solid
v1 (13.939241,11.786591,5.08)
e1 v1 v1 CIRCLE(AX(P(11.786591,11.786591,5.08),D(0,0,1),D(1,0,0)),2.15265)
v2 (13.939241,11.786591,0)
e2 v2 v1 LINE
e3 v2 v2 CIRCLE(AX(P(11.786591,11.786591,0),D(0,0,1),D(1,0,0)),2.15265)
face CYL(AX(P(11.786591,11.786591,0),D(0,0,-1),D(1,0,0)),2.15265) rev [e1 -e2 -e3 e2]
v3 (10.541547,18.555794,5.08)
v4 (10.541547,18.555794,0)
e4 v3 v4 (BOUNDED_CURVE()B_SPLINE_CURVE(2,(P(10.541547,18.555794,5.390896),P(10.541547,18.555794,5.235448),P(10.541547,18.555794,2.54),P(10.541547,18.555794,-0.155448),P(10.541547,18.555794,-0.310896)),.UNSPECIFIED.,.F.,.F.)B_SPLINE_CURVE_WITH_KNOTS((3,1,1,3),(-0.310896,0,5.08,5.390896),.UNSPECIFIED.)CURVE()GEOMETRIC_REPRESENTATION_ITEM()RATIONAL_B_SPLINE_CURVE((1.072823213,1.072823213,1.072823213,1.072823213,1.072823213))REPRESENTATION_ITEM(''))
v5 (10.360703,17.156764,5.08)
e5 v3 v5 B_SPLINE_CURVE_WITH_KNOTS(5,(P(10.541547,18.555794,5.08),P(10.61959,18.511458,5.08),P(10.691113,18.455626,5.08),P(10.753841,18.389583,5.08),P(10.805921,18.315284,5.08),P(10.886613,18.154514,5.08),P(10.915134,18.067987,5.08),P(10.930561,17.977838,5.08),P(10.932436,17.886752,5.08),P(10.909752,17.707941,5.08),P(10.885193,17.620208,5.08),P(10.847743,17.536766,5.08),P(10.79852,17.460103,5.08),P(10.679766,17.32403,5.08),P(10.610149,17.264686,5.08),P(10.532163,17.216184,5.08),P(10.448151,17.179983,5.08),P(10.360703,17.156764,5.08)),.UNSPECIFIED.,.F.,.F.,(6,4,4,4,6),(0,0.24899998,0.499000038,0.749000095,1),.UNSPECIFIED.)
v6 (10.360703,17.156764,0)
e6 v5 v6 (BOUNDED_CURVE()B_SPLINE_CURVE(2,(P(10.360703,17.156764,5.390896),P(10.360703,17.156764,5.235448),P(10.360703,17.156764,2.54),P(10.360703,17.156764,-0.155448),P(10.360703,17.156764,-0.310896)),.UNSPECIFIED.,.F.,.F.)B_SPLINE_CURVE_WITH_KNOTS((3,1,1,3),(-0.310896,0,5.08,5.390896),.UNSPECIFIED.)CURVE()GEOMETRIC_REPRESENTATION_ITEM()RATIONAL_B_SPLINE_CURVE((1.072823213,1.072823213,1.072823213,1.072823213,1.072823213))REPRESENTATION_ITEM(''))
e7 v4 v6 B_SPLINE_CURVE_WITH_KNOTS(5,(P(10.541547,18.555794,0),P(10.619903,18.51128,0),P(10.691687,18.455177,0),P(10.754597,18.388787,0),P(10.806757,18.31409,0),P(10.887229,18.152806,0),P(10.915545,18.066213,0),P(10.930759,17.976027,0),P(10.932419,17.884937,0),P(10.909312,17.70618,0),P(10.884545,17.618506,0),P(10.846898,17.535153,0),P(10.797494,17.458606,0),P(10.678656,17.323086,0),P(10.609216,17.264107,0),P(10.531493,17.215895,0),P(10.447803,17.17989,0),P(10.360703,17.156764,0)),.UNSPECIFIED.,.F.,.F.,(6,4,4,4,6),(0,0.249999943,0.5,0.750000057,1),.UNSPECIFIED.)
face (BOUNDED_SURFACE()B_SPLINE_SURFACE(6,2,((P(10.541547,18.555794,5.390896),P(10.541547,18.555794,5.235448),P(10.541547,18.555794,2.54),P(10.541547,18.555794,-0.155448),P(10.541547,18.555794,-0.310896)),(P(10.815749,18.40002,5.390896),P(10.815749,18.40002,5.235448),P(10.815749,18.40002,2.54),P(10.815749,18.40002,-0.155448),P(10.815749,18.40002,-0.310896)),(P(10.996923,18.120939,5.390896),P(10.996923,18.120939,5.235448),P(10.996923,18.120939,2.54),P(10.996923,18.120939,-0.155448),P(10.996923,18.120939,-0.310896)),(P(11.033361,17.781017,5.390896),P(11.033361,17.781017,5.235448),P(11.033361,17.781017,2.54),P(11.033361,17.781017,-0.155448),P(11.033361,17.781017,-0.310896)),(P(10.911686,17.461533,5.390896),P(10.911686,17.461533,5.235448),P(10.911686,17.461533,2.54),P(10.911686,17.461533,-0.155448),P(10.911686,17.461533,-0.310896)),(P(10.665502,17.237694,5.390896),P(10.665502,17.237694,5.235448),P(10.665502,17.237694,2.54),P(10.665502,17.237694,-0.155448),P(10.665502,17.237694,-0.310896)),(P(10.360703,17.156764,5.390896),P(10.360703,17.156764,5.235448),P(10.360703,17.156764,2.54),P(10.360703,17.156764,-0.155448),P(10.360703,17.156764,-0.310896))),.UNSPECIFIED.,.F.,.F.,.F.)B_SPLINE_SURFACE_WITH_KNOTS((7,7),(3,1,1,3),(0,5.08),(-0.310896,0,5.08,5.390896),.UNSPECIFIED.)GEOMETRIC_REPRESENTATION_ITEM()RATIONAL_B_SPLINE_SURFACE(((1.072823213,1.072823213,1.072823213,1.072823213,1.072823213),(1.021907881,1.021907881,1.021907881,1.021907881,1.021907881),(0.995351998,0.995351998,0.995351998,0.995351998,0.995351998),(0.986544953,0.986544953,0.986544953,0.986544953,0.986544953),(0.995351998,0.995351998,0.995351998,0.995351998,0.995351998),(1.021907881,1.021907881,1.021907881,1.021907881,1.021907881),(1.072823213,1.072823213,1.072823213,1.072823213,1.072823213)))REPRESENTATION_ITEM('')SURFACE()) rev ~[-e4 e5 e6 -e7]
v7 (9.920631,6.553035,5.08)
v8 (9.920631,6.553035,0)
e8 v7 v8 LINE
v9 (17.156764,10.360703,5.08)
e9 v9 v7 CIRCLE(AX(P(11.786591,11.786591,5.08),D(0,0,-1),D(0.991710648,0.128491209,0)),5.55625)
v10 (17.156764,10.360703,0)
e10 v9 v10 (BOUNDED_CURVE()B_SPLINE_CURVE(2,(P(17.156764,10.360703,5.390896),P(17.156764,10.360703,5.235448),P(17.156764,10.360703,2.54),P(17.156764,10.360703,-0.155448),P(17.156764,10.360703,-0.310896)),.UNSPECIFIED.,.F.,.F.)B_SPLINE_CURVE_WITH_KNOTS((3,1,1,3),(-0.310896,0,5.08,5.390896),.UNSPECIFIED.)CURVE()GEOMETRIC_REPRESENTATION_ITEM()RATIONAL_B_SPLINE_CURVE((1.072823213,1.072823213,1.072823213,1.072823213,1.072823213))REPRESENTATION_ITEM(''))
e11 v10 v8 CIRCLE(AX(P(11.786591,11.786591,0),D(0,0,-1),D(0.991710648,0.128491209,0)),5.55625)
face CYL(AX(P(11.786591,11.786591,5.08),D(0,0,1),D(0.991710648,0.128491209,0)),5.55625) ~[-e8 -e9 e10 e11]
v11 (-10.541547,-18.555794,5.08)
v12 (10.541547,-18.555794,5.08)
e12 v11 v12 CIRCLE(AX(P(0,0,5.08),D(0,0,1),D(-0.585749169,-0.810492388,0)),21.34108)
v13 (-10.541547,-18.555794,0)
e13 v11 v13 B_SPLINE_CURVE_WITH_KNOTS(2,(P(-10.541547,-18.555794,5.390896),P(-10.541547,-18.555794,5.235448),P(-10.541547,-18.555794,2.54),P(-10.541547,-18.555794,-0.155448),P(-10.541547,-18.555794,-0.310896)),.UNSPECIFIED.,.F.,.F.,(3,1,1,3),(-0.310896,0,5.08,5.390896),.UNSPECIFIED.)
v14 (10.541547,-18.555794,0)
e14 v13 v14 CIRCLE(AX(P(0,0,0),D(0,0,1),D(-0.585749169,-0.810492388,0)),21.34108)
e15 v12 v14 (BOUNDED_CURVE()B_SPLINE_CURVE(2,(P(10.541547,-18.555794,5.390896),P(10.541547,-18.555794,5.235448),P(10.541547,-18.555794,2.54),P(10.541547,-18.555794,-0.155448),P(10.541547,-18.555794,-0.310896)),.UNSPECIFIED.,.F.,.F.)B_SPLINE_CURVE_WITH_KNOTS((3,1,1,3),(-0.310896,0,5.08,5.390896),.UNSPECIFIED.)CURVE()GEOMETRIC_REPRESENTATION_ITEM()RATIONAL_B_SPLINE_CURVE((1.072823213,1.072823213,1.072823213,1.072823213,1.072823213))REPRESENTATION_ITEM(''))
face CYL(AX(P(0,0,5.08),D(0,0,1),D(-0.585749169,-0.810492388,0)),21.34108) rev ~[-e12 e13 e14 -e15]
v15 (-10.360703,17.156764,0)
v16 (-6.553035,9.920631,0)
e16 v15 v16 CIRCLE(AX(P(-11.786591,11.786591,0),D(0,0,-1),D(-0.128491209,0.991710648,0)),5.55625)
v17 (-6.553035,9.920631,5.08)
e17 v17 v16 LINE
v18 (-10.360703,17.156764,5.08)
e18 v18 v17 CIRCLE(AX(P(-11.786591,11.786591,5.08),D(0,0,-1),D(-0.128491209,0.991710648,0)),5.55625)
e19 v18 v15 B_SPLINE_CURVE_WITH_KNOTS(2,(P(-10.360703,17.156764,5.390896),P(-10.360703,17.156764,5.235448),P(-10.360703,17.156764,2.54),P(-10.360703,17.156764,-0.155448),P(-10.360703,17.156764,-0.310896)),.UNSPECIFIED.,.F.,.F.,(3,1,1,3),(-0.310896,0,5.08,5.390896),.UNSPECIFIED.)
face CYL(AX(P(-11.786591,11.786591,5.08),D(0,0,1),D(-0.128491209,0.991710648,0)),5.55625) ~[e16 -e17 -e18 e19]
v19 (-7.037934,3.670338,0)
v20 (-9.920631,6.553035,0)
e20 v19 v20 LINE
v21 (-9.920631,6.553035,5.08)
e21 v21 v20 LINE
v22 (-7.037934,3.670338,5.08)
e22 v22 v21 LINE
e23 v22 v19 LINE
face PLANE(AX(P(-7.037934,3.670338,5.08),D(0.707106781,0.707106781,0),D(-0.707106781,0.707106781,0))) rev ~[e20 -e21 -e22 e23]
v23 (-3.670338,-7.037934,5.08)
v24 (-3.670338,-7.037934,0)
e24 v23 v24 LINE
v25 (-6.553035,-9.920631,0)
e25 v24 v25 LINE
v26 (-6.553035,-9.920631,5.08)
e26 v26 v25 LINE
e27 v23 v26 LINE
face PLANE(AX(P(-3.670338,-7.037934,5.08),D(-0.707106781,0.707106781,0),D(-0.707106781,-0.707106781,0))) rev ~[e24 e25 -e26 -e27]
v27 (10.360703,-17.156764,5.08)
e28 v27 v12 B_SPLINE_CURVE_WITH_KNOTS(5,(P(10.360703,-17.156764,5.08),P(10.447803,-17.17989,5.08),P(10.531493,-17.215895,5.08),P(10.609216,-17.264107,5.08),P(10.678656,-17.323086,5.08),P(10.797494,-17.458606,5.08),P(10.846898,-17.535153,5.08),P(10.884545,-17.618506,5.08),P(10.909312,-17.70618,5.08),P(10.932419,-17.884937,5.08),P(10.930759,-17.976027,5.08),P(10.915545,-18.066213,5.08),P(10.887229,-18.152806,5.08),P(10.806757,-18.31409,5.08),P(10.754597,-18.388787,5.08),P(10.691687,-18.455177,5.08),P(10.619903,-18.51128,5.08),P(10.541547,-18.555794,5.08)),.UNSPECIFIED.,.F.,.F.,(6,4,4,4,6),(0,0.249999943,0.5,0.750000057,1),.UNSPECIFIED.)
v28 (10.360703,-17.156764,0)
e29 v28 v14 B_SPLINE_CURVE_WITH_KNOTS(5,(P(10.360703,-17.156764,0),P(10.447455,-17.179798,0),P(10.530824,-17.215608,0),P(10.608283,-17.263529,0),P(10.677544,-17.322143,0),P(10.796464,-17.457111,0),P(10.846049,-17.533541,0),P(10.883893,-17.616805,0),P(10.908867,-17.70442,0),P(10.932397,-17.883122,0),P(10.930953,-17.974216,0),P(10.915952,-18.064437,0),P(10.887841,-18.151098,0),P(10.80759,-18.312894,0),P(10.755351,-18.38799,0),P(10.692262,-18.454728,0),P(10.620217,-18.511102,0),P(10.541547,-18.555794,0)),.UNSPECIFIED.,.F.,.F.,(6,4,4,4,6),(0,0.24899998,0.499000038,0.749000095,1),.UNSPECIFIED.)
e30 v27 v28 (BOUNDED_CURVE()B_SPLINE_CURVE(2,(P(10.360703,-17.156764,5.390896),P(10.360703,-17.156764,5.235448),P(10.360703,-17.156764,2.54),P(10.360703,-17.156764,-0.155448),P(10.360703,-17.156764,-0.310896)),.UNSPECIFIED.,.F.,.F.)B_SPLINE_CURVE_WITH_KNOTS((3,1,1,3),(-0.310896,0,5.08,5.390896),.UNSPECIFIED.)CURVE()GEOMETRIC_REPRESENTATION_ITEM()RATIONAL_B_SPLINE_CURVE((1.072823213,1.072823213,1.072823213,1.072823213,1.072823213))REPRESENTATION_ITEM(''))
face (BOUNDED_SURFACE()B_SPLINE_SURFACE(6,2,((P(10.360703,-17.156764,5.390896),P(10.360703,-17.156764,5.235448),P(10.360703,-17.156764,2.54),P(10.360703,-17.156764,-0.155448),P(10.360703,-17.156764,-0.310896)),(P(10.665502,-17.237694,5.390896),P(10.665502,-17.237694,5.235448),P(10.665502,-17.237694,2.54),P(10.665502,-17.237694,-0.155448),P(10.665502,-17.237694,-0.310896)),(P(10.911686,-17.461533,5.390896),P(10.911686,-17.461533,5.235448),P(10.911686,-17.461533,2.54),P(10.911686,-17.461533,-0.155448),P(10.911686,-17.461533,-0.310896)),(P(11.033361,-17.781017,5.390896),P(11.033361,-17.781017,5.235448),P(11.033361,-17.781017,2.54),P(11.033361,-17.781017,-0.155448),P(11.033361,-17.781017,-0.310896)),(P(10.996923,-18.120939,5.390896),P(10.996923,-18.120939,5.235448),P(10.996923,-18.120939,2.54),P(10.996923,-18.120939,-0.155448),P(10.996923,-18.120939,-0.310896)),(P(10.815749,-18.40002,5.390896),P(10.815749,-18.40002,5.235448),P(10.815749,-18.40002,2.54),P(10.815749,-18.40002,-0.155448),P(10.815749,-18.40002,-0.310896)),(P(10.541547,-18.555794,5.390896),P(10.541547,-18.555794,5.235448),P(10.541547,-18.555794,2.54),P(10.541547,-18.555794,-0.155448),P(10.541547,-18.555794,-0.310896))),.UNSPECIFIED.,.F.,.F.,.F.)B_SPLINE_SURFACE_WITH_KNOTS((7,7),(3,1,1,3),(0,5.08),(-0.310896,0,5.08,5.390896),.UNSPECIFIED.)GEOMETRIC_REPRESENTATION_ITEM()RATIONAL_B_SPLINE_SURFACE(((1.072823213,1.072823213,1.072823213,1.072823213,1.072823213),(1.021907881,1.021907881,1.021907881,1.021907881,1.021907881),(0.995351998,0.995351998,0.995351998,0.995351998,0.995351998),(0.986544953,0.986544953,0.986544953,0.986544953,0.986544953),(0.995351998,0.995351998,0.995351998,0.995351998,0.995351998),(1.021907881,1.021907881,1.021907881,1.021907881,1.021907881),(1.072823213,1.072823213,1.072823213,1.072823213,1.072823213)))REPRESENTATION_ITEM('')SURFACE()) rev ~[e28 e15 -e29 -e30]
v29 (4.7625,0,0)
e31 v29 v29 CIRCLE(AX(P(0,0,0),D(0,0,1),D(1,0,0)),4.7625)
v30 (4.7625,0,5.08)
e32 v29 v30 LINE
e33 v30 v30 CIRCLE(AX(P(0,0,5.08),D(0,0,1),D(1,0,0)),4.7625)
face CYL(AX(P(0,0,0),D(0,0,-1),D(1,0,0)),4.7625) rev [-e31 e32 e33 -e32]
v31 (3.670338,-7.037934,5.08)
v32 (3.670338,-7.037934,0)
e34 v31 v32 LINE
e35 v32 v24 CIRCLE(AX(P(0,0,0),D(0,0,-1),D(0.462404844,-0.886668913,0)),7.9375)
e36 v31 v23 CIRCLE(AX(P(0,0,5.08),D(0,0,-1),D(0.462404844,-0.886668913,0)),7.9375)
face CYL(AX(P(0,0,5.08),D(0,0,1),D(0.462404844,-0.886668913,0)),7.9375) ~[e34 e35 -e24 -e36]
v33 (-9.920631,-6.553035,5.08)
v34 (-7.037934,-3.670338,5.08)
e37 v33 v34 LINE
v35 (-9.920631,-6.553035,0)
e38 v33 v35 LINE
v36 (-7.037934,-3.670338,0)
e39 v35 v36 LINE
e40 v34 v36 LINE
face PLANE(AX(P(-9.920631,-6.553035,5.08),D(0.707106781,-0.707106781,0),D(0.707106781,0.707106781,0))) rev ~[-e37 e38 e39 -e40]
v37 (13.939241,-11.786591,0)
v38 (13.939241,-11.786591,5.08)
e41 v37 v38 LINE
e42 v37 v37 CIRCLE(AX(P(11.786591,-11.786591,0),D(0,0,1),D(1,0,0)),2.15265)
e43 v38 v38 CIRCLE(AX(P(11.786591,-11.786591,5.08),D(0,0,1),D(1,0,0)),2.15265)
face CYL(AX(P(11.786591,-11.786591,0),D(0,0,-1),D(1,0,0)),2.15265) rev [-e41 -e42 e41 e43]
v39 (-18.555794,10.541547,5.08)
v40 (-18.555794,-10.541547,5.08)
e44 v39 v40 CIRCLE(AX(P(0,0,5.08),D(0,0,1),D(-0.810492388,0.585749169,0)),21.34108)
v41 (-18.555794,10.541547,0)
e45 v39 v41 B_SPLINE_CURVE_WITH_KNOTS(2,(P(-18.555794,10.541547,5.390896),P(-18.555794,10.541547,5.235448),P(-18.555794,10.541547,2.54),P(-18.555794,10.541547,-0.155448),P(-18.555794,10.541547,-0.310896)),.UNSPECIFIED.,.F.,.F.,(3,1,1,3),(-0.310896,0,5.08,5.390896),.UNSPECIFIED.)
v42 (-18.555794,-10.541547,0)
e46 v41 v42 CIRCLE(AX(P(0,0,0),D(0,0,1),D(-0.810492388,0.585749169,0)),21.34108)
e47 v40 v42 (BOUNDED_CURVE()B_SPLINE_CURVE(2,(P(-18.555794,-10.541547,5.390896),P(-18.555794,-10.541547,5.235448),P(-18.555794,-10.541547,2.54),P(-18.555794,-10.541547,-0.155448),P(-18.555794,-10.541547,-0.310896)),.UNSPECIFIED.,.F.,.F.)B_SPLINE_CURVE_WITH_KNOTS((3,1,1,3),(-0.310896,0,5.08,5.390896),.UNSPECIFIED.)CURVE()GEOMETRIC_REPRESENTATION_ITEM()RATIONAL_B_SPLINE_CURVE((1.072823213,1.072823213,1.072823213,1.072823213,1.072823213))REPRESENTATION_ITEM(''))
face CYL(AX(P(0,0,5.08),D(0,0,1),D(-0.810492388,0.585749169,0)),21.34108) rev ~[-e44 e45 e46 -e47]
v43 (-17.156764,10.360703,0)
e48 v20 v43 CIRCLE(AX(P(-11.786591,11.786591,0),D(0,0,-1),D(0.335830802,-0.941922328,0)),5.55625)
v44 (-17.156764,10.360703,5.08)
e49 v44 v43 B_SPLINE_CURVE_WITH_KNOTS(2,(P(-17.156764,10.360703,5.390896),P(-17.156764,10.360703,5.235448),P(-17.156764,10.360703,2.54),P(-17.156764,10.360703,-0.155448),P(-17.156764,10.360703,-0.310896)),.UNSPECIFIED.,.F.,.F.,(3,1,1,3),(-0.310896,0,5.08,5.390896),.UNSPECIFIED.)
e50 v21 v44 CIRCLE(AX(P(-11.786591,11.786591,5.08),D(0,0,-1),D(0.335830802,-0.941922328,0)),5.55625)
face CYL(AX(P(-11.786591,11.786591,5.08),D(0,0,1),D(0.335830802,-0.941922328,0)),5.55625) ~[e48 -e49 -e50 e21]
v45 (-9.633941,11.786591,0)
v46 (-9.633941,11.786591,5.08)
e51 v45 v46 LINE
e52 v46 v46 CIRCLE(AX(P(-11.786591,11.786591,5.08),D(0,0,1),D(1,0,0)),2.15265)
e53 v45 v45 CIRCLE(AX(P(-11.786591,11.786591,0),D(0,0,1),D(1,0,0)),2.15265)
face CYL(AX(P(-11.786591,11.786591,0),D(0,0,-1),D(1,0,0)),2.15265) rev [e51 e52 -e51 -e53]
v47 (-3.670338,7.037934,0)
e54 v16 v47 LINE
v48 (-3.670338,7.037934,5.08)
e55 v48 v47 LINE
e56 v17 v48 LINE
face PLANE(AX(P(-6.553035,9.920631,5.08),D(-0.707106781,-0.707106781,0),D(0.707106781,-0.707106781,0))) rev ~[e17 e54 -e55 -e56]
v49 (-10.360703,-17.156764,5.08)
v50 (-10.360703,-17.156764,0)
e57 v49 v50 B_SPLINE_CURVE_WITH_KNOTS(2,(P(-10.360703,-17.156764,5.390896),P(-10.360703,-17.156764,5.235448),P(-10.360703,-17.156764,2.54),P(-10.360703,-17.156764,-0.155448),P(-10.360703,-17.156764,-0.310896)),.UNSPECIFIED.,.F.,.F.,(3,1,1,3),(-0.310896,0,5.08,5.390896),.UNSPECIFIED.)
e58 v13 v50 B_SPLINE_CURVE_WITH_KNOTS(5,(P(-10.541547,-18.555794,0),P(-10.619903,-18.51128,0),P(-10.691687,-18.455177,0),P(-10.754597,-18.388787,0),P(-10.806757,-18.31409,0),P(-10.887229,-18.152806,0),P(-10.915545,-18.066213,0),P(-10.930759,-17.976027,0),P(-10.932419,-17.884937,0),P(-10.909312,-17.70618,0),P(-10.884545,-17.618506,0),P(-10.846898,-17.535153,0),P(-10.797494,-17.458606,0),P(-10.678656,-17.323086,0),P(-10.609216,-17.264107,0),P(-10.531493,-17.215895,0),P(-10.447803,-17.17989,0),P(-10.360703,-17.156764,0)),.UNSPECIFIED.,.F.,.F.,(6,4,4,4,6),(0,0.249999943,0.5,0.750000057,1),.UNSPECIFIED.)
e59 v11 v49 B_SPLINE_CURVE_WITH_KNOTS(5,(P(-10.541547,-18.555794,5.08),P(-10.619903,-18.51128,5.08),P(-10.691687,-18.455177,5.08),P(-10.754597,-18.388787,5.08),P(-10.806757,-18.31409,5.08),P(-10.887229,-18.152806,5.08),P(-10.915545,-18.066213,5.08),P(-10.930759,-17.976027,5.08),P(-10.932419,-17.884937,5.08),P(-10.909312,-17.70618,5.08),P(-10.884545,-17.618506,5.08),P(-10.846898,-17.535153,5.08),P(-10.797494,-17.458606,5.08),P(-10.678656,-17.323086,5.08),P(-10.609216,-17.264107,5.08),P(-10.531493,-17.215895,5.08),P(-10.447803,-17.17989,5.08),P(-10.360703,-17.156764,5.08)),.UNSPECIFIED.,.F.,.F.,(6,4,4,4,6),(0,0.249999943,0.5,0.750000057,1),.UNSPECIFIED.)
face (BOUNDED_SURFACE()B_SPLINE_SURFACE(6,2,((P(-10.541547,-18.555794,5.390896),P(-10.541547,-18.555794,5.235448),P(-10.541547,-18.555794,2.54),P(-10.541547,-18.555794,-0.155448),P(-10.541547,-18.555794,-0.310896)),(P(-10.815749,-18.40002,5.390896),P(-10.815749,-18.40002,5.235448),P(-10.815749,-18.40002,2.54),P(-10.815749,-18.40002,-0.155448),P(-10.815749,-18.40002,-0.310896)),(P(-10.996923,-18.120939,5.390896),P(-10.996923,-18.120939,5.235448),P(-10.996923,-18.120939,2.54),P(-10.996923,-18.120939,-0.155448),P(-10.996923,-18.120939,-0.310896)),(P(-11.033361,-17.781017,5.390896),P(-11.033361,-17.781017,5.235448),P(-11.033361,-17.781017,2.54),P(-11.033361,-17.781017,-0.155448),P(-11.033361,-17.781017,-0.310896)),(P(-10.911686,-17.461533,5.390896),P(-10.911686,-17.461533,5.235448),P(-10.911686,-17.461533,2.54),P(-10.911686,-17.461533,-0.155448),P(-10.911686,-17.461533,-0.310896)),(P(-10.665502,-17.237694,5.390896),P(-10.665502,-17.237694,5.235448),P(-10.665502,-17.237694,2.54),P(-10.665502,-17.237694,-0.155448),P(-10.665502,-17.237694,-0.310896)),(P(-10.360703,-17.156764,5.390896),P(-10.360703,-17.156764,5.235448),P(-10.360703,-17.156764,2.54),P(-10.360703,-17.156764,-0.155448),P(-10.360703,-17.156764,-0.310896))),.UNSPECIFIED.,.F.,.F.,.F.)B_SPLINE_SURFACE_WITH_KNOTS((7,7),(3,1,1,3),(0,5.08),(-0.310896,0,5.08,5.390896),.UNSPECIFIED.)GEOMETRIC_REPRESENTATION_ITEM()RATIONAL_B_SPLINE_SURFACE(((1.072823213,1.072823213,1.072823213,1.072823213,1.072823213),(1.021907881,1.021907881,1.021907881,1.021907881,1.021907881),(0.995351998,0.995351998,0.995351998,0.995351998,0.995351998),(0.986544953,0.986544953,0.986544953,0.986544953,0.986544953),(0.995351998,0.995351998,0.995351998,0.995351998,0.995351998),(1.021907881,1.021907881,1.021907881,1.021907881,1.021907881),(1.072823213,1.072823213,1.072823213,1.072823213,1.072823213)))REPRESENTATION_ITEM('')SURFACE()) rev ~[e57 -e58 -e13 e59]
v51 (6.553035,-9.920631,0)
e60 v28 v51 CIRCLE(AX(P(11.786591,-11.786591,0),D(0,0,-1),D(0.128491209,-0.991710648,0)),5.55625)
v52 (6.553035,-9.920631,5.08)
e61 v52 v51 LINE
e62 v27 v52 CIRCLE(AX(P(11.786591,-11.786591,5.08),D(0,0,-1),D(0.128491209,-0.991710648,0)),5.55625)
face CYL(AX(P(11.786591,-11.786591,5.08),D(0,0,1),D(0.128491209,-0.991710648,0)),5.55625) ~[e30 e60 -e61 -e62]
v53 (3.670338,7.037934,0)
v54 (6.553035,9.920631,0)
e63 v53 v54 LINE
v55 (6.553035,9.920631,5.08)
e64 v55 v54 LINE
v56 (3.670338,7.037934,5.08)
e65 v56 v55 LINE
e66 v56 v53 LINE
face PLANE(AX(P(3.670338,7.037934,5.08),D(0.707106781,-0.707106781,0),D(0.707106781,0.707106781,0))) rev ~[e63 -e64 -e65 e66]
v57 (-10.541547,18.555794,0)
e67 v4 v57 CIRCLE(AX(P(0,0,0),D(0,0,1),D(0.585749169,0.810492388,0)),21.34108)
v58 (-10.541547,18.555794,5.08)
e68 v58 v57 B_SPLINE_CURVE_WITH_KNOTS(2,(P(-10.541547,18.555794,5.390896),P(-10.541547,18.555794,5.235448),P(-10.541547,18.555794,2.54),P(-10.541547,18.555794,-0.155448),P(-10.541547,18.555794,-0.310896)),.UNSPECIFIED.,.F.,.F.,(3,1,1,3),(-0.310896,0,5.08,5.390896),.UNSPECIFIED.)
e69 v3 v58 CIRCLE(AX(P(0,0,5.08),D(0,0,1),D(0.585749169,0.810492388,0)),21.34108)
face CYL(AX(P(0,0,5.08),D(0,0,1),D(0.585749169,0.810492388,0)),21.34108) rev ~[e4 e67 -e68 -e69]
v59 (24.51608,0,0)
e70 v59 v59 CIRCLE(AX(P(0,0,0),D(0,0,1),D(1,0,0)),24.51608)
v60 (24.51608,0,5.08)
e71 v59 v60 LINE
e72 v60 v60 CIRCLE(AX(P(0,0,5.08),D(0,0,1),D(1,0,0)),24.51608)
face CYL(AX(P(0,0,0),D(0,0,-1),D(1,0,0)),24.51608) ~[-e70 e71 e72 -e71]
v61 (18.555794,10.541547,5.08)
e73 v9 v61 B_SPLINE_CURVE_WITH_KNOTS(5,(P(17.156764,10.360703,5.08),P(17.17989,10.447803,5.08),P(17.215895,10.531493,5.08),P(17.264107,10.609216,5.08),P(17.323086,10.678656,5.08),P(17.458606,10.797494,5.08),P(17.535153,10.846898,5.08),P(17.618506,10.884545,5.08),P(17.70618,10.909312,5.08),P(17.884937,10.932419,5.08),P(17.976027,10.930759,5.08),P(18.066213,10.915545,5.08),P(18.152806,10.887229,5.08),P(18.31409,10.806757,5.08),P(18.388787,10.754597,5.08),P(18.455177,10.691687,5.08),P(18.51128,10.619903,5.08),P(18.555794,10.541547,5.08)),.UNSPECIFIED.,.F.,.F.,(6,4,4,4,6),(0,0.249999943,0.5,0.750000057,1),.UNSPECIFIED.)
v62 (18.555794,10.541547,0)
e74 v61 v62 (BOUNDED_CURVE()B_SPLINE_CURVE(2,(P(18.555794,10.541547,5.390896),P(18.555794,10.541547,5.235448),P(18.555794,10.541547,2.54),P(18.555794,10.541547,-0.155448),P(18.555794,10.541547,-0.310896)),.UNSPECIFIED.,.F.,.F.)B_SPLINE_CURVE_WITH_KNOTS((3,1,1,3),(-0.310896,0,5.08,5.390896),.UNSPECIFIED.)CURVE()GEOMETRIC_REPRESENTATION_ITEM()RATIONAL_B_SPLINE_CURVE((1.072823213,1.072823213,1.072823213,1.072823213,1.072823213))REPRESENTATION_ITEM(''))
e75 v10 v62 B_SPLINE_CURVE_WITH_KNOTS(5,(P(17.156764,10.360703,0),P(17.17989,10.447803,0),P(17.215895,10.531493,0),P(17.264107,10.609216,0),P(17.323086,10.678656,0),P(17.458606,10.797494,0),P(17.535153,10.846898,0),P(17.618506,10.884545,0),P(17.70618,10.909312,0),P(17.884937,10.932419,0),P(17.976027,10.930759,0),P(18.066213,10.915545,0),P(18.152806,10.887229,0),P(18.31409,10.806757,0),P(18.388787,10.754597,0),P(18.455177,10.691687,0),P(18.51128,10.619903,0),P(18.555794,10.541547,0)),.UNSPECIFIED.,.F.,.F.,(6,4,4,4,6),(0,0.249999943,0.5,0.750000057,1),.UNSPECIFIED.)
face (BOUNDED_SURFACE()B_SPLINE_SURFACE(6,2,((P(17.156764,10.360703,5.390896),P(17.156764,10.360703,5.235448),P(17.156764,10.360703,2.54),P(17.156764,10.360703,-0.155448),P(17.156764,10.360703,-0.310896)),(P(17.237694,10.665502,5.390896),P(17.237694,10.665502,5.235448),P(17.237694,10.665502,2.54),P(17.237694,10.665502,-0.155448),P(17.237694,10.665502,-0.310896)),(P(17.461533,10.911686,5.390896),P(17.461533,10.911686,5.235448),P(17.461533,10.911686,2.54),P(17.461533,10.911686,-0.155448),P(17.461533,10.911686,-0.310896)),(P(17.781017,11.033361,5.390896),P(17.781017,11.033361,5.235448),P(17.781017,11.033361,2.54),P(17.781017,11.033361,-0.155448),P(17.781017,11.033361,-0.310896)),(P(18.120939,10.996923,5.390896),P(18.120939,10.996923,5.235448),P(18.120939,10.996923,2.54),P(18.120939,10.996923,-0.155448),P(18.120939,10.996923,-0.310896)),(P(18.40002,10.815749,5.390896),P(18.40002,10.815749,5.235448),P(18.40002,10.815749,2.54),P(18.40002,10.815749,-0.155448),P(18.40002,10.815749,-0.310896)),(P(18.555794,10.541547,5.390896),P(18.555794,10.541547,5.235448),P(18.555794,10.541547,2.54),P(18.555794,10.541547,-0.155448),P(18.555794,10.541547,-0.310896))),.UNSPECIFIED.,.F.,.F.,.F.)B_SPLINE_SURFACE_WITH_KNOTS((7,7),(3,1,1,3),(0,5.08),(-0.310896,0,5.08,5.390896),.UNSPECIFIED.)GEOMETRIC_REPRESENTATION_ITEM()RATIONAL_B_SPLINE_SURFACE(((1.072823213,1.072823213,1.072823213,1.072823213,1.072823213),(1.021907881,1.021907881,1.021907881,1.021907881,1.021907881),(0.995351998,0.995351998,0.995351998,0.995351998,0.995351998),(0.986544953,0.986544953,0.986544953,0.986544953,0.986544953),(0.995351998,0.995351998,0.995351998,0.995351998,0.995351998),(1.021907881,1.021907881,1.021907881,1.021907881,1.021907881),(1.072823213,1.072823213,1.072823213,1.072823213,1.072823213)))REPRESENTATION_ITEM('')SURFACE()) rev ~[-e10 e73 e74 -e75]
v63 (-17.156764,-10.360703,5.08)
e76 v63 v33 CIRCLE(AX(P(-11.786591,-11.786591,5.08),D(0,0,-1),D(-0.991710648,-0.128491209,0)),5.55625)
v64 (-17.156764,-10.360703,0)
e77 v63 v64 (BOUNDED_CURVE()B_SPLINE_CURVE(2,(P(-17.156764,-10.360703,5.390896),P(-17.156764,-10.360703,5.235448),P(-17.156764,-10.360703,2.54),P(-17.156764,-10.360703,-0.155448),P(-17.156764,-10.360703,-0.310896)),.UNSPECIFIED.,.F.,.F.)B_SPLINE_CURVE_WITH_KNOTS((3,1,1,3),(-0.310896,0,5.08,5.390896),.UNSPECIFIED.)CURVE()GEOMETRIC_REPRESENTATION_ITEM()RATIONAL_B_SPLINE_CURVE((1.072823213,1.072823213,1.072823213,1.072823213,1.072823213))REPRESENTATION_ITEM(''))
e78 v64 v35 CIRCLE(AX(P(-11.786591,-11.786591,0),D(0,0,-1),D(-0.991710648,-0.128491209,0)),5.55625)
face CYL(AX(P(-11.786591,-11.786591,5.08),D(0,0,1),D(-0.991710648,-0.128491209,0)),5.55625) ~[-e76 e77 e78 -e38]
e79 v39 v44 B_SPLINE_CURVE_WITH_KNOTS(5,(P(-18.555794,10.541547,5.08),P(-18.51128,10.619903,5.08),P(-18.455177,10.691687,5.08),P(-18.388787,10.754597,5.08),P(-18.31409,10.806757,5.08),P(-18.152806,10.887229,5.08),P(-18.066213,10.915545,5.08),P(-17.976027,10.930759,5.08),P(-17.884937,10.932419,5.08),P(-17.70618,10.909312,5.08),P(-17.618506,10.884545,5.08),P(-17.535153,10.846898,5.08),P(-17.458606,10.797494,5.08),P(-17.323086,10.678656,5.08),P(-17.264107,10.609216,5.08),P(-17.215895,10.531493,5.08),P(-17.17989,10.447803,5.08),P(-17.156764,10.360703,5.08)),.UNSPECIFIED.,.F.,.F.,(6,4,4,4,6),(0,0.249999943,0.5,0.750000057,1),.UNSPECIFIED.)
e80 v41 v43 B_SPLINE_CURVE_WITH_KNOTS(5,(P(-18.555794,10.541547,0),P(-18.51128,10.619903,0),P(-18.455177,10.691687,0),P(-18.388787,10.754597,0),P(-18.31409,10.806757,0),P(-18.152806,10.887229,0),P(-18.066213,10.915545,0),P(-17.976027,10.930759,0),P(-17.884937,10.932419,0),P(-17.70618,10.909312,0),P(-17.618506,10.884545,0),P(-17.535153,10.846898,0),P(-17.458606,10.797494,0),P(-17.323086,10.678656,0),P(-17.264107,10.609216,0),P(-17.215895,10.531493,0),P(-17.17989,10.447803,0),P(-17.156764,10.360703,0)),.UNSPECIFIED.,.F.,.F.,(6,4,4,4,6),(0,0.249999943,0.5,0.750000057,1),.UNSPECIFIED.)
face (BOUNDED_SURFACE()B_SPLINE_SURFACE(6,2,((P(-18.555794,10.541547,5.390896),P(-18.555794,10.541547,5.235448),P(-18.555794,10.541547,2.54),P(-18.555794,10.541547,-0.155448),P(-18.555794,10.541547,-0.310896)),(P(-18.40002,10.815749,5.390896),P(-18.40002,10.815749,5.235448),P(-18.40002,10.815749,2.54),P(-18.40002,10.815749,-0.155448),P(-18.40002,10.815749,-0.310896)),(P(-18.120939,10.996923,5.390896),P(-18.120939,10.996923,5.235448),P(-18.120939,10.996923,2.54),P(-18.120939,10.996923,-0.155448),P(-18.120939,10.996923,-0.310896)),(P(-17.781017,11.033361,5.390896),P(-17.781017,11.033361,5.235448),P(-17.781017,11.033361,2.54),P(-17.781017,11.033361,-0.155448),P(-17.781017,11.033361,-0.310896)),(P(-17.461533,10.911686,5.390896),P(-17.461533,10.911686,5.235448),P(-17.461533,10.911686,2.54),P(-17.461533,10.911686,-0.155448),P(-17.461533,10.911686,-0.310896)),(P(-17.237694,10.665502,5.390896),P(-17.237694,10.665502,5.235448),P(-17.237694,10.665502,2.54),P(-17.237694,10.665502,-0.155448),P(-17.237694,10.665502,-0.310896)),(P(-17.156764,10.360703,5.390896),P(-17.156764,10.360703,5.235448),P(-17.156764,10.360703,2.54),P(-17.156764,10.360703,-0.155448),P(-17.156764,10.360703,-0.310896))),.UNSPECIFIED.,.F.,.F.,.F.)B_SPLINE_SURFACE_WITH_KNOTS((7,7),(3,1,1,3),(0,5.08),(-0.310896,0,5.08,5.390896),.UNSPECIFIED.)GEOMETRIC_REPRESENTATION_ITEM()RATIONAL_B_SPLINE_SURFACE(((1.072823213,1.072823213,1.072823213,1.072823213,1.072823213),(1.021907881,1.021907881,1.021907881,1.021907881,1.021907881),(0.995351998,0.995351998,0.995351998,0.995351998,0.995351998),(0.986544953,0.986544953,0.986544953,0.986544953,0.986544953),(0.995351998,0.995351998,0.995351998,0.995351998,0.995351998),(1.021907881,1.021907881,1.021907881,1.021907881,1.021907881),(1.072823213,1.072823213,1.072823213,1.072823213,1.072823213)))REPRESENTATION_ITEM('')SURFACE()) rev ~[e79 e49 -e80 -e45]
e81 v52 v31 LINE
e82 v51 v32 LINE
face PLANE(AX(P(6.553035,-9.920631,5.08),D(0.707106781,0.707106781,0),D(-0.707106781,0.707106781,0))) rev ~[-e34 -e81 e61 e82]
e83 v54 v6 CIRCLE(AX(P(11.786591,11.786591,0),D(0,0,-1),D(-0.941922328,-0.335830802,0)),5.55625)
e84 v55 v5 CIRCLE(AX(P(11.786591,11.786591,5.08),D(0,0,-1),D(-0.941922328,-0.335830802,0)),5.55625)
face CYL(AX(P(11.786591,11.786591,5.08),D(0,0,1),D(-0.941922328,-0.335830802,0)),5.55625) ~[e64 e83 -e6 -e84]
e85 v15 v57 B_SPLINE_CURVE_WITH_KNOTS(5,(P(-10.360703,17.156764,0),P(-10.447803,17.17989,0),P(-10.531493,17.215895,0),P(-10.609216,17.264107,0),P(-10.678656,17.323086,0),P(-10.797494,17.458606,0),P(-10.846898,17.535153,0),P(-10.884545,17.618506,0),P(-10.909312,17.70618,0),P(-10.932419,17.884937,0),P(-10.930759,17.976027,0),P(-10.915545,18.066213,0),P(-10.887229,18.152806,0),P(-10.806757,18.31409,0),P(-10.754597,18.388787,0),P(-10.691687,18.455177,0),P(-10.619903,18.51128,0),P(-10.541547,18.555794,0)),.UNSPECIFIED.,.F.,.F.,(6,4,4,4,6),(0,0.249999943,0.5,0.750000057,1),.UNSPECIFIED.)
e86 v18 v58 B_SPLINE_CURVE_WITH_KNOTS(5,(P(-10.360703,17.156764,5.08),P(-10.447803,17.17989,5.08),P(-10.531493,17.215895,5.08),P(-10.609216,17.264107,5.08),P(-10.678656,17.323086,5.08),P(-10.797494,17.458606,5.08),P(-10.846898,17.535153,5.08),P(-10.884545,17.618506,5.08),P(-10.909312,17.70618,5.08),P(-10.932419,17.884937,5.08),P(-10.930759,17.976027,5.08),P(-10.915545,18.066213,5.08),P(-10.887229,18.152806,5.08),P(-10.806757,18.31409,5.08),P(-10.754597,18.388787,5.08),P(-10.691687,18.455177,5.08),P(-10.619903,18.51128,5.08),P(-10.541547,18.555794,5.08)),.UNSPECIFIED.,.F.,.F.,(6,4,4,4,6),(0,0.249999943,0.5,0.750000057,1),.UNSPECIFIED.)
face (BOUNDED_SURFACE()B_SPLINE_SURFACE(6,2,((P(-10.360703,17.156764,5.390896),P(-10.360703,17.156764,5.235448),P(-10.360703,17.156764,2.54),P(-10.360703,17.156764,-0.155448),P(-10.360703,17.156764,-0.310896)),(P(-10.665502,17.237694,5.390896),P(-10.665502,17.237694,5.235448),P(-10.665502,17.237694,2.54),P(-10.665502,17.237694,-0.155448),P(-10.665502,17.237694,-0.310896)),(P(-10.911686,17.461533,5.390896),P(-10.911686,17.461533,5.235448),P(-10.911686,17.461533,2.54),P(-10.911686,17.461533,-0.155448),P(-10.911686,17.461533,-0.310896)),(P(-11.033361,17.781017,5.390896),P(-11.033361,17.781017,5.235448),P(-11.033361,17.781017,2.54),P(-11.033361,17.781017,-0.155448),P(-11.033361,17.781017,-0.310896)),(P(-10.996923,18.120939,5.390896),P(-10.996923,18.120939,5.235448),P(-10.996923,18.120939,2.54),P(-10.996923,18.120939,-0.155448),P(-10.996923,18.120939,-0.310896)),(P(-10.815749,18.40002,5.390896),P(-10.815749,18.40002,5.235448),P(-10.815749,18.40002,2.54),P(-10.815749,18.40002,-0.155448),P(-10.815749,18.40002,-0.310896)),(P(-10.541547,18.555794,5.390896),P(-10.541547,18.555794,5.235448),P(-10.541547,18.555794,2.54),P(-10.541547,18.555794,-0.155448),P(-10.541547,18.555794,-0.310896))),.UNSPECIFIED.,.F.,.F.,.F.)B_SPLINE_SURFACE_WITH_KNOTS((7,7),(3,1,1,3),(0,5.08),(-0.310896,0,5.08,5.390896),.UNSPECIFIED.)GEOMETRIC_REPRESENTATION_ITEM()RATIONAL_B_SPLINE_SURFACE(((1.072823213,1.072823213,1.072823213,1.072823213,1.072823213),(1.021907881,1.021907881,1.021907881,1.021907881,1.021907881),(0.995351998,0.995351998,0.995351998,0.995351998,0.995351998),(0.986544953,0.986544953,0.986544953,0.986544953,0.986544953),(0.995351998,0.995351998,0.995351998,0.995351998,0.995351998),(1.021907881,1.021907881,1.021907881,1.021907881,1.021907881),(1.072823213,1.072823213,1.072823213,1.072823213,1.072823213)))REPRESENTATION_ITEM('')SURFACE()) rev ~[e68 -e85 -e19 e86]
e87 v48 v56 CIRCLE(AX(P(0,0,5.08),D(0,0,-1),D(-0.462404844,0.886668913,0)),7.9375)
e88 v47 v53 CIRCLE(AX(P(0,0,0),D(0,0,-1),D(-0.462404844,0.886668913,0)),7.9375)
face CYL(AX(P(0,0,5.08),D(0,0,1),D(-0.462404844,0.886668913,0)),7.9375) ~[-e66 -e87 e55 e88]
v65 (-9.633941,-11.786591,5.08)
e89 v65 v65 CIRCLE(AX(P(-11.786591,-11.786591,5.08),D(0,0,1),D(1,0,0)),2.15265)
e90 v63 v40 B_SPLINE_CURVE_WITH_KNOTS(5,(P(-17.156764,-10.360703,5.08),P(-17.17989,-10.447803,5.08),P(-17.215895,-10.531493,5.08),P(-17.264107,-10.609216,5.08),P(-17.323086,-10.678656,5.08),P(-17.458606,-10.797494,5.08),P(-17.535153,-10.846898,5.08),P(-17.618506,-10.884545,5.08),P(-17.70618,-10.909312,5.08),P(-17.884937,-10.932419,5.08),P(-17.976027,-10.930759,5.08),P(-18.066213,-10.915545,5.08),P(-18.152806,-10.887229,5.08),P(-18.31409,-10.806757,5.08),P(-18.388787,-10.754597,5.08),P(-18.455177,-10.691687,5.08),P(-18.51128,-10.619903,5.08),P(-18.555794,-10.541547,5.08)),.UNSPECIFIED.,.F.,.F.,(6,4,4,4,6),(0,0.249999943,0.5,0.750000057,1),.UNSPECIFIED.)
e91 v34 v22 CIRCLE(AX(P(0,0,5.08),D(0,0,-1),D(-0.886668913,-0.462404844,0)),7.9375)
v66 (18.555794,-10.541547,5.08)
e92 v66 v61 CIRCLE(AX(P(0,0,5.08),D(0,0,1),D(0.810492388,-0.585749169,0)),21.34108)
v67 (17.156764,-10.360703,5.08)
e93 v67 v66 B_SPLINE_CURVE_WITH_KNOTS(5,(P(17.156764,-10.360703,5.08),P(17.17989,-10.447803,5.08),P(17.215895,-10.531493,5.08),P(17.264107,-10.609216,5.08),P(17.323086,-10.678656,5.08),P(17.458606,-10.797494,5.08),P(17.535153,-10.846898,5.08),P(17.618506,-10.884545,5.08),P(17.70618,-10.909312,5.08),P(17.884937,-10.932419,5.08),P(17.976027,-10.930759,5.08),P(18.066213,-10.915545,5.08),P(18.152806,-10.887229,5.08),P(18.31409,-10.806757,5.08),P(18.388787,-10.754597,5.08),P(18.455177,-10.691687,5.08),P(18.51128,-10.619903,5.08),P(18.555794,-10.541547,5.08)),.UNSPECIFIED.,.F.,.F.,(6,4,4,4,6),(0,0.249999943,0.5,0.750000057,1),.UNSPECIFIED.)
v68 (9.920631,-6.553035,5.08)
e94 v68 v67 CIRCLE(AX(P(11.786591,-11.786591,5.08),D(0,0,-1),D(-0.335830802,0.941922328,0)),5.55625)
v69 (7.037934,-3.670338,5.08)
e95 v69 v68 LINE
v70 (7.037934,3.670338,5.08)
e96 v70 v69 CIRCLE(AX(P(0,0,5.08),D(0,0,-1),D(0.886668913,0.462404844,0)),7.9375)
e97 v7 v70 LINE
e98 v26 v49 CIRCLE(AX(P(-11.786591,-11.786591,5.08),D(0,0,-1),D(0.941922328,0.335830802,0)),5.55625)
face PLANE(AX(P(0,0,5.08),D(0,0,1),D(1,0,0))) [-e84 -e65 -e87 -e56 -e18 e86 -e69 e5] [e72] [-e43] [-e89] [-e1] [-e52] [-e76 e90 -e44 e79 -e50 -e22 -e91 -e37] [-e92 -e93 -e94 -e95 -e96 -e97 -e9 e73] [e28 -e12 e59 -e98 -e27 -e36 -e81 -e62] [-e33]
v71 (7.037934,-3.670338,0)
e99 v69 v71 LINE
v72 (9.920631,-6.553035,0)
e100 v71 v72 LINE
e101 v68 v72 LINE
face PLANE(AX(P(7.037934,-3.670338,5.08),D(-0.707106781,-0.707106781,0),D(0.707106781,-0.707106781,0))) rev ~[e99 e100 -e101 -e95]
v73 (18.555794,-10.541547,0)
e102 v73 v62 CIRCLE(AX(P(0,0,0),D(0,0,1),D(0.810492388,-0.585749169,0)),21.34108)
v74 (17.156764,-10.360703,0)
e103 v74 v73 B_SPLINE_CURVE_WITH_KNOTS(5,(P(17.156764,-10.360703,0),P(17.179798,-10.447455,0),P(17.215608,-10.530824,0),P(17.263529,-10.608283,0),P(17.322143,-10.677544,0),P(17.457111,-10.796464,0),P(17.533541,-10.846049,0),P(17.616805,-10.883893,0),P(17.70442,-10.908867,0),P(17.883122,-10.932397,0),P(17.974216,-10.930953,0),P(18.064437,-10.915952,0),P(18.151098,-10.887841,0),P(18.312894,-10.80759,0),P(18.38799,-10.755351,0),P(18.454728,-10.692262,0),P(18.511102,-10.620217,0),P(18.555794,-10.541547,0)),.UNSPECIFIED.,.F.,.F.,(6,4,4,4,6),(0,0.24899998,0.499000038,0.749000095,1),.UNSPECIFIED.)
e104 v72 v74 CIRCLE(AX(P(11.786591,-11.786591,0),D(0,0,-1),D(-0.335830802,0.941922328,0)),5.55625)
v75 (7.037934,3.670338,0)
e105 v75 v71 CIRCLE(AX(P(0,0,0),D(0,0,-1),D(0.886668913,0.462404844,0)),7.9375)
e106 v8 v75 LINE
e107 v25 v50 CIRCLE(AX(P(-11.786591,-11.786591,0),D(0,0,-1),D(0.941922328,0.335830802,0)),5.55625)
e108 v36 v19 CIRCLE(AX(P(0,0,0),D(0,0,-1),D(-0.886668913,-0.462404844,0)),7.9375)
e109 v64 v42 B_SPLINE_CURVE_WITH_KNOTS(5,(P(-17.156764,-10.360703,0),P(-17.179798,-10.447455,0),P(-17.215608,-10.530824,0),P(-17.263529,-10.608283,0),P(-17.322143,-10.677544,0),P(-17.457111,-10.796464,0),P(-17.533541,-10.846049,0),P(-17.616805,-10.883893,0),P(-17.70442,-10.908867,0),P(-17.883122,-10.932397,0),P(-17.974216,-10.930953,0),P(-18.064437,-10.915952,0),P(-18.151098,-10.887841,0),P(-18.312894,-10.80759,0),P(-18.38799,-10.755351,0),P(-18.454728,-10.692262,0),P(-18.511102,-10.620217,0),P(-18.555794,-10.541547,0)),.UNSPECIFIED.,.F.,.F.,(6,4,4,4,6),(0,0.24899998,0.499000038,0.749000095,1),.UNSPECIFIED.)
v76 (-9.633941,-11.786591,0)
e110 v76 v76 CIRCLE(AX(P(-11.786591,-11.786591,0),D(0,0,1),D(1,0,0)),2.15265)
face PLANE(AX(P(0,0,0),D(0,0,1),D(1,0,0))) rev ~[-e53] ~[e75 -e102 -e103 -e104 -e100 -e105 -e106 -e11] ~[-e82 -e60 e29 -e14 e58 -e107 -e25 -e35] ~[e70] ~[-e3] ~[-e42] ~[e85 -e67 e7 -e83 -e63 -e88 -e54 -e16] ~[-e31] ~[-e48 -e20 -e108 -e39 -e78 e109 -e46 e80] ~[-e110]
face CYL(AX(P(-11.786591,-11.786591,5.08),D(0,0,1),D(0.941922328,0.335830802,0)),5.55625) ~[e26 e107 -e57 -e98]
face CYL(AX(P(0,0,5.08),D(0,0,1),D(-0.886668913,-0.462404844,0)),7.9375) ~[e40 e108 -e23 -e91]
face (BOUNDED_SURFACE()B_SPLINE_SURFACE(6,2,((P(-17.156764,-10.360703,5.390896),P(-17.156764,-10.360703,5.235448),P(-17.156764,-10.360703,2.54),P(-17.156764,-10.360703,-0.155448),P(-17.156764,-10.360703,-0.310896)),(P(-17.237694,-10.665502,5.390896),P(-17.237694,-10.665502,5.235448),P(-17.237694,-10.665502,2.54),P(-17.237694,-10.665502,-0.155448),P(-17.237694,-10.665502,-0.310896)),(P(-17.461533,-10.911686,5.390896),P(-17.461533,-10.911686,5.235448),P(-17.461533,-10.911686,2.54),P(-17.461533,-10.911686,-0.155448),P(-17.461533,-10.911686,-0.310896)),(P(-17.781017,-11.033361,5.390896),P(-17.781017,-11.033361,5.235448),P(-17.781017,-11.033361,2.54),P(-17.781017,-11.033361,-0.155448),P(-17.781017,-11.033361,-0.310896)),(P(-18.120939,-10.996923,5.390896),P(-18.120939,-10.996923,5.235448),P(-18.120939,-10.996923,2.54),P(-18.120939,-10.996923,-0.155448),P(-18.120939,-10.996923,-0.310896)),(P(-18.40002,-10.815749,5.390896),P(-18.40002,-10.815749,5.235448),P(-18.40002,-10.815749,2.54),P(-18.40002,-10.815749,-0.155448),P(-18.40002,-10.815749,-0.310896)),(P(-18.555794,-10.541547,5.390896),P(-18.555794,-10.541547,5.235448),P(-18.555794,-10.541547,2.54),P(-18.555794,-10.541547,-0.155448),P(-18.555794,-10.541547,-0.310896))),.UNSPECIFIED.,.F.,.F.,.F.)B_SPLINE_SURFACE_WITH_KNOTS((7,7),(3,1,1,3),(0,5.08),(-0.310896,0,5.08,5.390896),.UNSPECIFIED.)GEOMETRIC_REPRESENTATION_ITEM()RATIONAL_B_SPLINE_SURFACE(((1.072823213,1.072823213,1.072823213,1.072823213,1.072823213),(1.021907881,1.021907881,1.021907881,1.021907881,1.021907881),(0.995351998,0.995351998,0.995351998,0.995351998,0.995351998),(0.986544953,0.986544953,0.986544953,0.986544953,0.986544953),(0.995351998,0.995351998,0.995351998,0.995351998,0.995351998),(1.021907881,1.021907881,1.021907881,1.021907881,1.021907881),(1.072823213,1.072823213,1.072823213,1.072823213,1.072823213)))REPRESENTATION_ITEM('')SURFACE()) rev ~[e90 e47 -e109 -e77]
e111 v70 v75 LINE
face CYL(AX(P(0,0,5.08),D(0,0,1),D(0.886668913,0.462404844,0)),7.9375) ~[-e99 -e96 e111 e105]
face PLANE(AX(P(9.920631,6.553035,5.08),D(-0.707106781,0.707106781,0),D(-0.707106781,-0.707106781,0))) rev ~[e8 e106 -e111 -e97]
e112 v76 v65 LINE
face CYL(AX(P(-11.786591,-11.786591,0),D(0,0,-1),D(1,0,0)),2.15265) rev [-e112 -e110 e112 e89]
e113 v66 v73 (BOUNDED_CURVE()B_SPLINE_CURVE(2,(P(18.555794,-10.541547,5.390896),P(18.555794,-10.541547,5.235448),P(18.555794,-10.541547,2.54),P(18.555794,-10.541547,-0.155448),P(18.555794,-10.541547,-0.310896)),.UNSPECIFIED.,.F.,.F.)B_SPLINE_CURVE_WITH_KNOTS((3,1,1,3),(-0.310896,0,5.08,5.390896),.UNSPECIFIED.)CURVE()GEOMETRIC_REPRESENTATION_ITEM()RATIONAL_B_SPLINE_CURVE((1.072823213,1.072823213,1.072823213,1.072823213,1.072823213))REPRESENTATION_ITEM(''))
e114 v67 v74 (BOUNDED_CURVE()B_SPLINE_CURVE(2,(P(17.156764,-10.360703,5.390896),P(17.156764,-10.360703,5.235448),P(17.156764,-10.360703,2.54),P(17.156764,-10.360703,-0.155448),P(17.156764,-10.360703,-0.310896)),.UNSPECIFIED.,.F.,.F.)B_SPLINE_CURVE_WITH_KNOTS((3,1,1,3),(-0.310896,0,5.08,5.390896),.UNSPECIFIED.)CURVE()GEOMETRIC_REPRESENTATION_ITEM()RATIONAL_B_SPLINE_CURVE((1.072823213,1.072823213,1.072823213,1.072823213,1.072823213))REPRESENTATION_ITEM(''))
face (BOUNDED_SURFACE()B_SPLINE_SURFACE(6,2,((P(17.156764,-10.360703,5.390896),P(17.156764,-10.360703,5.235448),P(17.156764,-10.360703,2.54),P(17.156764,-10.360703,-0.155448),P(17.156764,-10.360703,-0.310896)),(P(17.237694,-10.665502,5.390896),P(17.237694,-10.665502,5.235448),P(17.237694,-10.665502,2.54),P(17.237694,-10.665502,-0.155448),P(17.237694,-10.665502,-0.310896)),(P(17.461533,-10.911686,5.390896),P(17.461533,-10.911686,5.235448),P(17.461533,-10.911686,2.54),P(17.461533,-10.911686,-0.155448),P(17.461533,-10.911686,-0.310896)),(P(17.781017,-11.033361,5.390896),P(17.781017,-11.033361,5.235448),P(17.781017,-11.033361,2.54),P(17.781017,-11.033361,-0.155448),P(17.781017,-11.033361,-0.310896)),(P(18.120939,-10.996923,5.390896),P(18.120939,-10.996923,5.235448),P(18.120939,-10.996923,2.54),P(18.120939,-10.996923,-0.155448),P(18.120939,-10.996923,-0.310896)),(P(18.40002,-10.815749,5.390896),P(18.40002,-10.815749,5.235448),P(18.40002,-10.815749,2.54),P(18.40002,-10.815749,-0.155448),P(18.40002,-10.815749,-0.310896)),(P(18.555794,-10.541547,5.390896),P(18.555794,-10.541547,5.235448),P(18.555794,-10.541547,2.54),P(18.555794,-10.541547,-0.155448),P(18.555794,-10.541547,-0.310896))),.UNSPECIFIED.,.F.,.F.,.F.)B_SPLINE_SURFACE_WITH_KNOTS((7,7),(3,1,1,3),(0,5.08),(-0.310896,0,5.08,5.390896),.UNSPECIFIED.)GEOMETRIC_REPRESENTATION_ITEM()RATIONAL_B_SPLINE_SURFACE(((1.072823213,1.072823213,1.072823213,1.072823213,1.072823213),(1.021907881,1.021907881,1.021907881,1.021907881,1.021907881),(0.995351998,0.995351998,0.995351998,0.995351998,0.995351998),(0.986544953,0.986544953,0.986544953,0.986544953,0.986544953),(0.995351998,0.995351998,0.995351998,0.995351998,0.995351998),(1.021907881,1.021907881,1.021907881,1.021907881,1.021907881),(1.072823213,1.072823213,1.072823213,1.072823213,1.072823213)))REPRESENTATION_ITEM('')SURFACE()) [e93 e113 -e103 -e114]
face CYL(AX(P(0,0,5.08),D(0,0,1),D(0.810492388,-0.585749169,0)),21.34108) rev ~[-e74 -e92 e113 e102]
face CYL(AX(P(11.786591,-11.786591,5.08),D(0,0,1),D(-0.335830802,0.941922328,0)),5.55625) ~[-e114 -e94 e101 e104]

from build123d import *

# Parameters (mm, degrees)
F0_R            = 24.51608
F0_R_2          = 2.15265
F0_R_3          = 4.7625
F1_DEPTH        = 5.08
F3_DEPTH        = 5.08
F3_COPIES_COUNT = 4
F4_R            = 0.762


# Not quite as in the source:
# - a pattern or mirror of a feature is missing from the dataset's text; its kind, count and spacing are read off the source's solid


with BuildPart() as f1:
    # F0 (on Top) → F1 (new body)
    with BuildSketch(Plane.XY):
        Circle(F0_R)
        with Locations((-11.7865906, -11.7865906)):
            Circle(F0_R_2, mode=Mode.SUBTRACT)
        with Locations((11.7865906, -11.7865906)):
            Circle(F0_R_2, mode=Mode.SUBTRACT)
        with Locations((-11.7865906, 11.7865906)):
            Circle(F0_R_2, mode=Mode.SUBTRACT)
        Circle(F0_R_3, mode=Mode.SUBTRACT)
        with Locations((11.7865906, 11.7865906)):
            Circle(F0_R_2, mode=Mode.SUBTRACT)
    extrude(amount=F1_DEPTH)

    # F2 (on face) → F3 (cut, through all)
    with BuildSketch(Plane.XY.offset(5.08)):
        with BuildLine():
            ThreePointArc((-12.5005198818, 17.2967828873), (-7.4612395718, 15.2741760893), (-6.553034663, 9.9206307084))
            Line((-6.553034663, 9.9206307084), (-3.6703384477, 7.0379344931))
            ThreePointArc((-3.6703384477, 7.0379344931), (0, 7.9375), (3.6703384477, 7.0379344931))
            Line((3.6703384477, 7.0379344931), (6.553034663, 9.9206307084))
            ThreePointArc((6.553034663, 9.9206307084), (7.4612395718, 15.2741760893), (12.5005198818, 17.2967828873))
            ThreePointArc((12.5005198818, 17.2967828873), (0, 21.34108), (-12.5005198818, 17.2967828873))
        make_face()
    f3 = extrude(amount=-F3_DEPTH, mode=Mode.SUBTRACT)

    # F3_copies: F3 ×4 about axis
    f3_copies_axis = Axis((0, 0, 0), (0, 0, 1))
    for i in range(1, F3_COPIES_COUNT):
        add(f3.rotate(f3_copies_axis, i * 360 / F3_COPIES_COUNT), mode=Mode.SUBTRACT)

    # F4
    f4_edges = [f1.edges().sort_by_distance(p)[0] for p in [
        (-12.50052, 17.296783, 2.54),
        (12.50052, 17.296783, 2.54),
        (-17.296783, -12.50052, 2.54),
        (-17.296783, 12.50052, 2.54),
        (12.50052, -17.296783, 2.54),
        (-12.50052, -17.296783, 2.54),
        (17.296783, 12.50052, 2.54),
        (17.296783, -12.50052, 2.54),
    ]]
    fillet(f4_edges, radius=F4_R)


solid = f1.part
